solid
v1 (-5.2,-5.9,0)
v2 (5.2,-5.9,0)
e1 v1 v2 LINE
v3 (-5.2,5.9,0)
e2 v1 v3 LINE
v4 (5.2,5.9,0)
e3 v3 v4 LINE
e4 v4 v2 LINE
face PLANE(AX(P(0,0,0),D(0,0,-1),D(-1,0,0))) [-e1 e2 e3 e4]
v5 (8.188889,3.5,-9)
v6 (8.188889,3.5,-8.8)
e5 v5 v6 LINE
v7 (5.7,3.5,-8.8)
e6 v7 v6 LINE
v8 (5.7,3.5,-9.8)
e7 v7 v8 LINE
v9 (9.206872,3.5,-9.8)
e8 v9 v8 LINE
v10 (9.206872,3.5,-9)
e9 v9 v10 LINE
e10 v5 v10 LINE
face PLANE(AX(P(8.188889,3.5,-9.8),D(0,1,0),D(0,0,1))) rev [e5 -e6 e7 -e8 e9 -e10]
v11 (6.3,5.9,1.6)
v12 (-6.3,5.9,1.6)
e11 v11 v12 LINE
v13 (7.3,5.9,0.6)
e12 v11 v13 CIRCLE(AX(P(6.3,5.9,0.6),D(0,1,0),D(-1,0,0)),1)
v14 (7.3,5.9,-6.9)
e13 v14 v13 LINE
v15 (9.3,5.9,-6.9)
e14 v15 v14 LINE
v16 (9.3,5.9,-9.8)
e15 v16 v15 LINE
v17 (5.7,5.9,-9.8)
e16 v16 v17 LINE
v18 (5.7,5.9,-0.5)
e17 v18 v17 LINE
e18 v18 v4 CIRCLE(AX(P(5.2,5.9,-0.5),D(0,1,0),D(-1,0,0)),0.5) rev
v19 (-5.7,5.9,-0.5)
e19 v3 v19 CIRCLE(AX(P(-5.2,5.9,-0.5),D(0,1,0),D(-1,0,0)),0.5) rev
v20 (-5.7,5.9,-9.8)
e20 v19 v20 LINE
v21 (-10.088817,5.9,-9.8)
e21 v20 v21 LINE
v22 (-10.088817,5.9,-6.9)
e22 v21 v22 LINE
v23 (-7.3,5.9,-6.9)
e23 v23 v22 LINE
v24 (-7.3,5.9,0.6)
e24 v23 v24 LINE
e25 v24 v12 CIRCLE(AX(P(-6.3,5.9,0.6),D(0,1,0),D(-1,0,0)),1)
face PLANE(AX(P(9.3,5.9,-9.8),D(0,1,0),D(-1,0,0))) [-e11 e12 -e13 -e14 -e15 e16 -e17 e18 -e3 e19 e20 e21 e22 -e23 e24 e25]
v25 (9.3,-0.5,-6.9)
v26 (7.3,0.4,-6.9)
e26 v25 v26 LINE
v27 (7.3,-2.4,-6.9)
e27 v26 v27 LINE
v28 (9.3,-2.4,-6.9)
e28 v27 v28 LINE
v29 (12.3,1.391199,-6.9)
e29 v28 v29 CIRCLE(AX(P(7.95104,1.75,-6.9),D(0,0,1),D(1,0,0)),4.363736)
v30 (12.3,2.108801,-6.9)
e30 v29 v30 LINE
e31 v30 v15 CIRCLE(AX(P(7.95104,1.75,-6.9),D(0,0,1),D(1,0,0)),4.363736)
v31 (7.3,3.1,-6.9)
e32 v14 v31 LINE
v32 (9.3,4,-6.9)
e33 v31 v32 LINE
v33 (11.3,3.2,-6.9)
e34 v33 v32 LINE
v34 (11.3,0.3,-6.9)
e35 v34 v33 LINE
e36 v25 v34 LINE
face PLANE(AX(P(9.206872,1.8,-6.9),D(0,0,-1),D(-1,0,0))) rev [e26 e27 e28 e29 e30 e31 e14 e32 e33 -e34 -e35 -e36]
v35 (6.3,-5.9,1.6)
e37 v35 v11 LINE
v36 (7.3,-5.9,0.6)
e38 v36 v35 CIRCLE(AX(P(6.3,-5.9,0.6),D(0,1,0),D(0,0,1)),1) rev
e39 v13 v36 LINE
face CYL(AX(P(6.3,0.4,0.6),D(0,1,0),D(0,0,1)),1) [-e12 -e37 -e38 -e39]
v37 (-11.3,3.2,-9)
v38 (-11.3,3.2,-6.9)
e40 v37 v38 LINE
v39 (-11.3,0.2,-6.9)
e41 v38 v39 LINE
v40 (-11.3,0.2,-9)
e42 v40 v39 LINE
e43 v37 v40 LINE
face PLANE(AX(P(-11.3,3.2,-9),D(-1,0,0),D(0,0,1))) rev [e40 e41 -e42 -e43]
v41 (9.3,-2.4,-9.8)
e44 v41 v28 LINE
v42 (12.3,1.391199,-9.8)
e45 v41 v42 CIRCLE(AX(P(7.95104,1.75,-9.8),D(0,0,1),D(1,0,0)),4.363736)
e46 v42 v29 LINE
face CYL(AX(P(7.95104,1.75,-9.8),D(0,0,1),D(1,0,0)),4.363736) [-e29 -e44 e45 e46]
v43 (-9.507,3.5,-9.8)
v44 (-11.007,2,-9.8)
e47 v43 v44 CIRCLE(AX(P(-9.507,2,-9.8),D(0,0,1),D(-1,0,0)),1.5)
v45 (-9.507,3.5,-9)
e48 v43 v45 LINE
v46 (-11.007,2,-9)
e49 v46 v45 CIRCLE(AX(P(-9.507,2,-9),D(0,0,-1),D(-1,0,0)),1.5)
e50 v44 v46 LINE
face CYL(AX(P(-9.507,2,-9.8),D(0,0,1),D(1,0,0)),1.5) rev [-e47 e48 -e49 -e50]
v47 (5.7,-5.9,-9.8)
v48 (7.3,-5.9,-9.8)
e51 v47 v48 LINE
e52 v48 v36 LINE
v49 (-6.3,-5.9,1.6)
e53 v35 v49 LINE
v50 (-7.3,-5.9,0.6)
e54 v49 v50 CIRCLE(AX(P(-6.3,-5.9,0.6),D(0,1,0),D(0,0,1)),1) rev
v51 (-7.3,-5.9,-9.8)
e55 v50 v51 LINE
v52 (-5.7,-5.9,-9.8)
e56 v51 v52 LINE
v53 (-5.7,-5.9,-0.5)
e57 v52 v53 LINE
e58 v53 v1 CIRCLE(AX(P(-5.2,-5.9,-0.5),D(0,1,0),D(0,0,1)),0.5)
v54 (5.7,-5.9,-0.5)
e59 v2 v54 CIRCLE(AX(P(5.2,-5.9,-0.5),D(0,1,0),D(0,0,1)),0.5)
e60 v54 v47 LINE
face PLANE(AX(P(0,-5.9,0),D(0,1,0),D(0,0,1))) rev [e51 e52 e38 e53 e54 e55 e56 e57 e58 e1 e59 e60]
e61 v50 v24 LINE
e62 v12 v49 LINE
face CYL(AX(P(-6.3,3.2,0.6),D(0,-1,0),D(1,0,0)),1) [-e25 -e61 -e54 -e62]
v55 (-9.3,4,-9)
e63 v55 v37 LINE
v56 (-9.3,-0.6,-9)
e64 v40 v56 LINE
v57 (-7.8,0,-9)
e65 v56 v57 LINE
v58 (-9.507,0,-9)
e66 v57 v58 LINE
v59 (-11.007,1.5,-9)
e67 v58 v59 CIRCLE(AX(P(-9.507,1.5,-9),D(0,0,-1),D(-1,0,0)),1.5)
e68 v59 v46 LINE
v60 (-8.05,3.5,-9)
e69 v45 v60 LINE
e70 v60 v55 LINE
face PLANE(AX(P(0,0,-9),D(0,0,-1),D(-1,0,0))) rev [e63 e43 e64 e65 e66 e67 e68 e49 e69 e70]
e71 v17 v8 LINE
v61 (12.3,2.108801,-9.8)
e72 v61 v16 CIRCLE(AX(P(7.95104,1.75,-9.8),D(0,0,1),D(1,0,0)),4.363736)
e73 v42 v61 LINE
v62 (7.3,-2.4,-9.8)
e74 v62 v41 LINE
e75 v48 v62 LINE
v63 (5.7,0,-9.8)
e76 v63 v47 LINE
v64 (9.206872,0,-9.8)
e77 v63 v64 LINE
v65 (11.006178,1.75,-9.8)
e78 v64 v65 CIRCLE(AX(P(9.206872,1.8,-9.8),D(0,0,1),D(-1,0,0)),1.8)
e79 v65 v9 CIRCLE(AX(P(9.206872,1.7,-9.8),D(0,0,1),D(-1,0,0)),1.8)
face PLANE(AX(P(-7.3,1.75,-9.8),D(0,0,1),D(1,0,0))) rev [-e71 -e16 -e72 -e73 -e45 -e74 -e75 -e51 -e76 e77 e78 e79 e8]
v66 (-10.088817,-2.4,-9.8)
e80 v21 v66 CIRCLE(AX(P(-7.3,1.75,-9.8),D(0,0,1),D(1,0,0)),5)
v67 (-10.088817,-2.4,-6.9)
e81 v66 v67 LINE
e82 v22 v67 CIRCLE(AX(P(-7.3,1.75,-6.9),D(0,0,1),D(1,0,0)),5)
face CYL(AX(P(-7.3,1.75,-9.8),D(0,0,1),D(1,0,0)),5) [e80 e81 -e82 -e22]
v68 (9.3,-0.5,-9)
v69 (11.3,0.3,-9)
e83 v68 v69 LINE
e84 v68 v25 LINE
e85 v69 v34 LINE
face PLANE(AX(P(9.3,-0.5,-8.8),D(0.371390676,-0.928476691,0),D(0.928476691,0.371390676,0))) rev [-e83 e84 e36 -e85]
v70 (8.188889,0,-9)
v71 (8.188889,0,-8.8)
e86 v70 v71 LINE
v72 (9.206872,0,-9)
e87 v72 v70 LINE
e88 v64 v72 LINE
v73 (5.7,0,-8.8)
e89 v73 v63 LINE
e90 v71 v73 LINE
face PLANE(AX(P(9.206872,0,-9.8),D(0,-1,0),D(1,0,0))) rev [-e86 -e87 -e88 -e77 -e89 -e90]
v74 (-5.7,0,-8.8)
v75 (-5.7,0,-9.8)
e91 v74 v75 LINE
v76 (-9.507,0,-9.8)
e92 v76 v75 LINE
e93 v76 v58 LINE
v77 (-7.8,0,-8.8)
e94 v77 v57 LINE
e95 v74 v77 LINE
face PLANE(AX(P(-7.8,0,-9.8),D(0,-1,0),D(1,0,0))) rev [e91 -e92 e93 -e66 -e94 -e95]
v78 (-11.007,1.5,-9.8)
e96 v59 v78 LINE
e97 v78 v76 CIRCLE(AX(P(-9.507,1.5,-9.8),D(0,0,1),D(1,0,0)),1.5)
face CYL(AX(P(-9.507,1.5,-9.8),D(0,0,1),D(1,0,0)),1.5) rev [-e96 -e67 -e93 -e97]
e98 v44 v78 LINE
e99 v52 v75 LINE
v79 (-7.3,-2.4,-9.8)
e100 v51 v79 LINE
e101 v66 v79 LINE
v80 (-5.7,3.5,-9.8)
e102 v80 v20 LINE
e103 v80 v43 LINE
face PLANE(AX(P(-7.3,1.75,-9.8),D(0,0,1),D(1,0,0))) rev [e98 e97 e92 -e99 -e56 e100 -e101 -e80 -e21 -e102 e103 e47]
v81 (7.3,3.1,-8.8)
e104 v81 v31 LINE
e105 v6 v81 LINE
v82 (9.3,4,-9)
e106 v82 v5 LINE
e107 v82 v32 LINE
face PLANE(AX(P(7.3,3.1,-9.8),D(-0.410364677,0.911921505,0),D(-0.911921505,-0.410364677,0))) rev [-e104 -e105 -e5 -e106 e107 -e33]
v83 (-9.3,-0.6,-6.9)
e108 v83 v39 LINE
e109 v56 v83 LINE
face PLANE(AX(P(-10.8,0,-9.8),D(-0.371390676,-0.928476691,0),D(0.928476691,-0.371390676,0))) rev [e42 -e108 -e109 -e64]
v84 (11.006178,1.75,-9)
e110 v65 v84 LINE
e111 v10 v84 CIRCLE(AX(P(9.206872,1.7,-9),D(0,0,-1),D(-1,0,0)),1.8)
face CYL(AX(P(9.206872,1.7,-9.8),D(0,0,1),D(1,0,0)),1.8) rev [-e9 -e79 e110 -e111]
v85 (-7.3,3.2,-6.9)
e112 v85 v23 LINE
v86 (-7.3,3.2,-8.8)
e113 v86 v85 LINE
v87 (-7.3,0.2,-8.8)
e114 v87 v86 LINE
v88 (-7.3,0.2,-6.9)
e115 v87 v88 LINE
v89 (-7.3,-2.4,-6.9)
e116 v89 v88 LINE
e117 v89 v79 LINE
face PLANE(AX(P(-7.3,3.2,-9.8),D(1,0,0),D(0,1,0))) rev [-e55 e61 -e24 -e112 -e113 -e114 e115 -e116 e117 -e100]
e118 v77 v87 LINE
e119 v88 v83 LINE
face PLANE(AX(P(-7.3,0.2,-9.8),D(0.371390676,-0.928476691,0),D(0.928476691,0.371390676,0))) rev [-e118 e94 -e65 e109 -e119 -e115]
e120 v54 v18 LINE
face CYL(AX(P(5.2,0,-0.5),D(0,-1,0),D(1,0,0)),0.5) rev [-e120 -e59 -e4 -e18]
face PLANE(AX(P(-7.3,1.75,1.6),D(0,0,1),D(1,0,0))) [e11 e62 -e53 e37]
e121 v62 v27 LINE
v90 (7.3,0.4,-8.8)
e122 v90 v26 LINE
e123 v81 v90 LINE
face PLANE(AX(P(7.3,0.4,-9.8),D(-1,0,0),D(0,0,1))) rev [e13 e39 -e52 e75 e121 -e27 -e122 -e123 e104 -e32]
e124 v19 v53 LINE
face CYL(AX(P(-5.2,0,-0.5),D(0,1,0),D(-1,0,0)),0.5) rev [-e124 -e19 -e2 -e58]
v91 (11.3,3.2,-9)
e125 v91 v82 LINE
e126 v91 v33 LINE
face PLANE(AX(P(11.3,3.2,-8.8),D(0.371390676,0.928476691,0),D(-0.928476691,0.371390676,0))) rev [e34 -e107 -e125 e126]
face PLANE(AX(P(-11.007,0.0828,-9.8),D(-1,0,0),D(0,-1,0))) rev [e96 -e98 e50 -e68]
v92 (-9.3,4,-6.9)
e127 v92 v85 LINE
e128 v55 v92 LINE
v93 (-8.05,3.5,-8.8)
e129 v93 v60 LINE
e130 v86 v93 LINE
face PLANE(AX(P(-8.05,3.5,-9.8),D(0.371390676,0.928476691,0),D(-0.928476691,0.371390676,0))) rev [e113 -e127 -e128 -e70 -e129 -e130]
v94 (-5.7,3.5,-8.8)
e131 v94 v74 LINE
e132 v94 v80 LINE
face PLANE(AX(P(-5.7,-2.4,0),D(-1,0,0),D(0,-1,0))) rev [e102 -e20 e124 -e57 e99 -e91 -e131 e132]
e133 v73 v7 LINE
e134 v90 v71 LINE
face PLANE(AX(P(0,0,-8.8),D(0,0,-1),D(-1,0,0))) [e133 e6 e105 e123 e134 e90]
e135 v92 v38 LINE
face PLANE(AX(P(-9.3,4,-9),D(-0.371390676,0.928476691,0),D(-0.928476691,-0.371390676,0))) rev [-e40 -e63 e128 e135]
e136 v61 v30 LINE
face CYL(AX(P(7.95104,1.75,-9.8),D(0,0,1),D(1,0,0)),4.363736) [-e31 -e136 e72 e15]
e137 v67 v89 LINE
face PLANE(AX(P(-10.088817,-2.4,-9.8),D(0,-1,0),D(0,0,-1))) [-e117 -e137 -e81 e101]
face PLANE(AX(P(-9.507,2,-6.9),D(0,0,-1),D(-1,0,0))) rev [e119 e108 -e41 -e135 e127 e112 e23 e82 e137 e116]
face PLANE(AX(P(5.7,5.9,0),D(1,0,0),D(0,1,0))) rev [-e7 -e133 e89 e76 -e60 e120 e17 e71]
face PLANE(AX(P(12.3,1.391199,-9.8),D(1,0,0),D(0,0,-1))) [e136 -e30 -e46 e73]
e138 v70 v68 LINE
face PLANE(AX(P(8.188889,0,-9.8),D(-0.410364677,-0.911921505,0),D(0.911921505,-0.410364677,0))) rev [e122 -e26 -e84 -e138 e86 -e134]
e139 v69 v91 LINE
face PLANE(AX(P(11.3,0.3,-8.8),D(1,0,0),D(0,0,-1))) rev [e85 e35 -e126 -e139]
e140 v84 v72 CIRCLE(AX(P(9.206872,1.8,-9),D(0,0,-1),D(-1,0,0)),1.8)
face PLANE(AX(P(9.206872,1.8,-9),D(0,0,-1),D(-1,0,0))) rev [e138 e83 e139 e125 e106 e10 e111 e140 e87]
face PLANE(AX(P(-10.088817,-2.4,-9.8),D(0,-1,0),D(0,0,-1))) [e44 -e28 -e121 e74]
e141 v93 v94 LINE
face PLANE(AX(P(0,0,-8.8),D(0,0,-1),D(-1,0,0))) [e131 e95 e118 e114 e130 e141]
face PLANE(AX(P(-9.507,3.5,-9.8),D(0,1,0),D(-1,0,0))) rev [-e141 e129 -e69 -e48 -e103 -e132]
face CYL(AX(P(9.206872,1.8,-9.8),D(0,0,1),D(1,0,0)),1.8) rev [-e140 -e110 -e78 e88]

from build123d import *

# Parameters (mm, degrees)
EXTRUDE_1_DEPTH      = 11.4
SKETCH_2_W           = 11.4
SKETCH_2_H           = 8.3
CUT_EXTRUDE_1_DEPTH  = 9.8
CUT_EXTRUDE_2_DEPTH  = 10.6
CUT_EXTRUDE_3_DEPTH  = 0.8
CUT_EXTRUDE_4_DEPTH  = 8.5
CUT_EXTRUDE_5_DEPTH  = 0.8
CUT_EXTRUDE_6_DEPTH  = 2.1
CUT_EXTRUDE_7_DEPTH  = 0.2
CUT_EXTRUDE_8_DEPTH  = 1
CUT_EXTRUDE_9_DEPTH  = 8.5
CUT_EXTRUDE_10_DEPTH = 1.9
CUT_EXTRUDE_11_DEPTH = 0.2
EXTRUDE_2_DEPTH      = 3.5
FILLET_1_R           = 0.5
FILLET_2_R           = 1
FILLET_3_R           = 1.5


with BuildPart() as part:
    # 草图1 → 凸台-拉伸1 (new body)
    with BuildSketch(Plane.XY.offset(1.6)):
        with BuildLine():
            Line((-10.088816953, -2.4), (9.3, -2.4))
            ThreePointArc((9.3, -2.4), (11.373008704, -0.957826085), (12.3, 1.391198782))
            Line((12.3, 1.391198782), (12.3, 2.108801218))
            ThreePointArc((12.3, 2.108801218), (11.373008704, 4.457826085), (9.3, 5.9))
            Line((9.3, 5.9), (-10.088816953, 5.9))
            ThreePointArc((-10.088816953, 5.9), (-12.3, 1.75), (-10.088816953, -2.4))
        make_face()
        with BuildLine():
            Line((-7.8, 0), (-10.8, 0))
            Line((-10.8, 0), (-11.007, 0.0828))
            Line((-11.007, 0.0828), (-11.007, 2))
            ThreePointArc((-11.007, 2), (-10.567660172, 3.060660172), (-9.507, 3.5))
            Line((-9.507, 3.5), (-8.05, 3.5))
            Line((-8.05, 3.5), (-7.3, 3.2))
            Line((-7.3, 3.2), (-7.3, 0.2))
            Line((-7.3, 0.2), (-7.8, 0))
        make_face(mode=Mode.SUBTRACT)
        with BuildLine():
            Line((7.3, 0.4), (7.3, 3.1))
            Line((7.3, 3.1), (8.188888889, 3.5))
            Line((8.188888889, 3.5), (9.206872393, 3.5))
            ThreePointArc((9.206872393, 3.5), (10.461862433, 2.99034879), (11.006177815, 1.75))
            ThreePointArc((11.006177815, 1.75), (10.461862433, 0.50965121), (9.206872393, 0))
            Line((9.206872393, 0), (8.188888889, 0))
            Line((8.188888889, 0), (7.3, 0.4))
        make_face(mode=Mode.SUBTRACT)
    extrude(amount=-EXTRUDE_1_DEPTH)

    # 草图2 → 切除-拉伸1 (cut)
    with BuildSketch(Plane(origin=(0, 0, -9.8), x_dir=(-1, 0, 0), z_dir=(0, 0, -1))):
        with Locations((0, 1.75)):
            Rectangle(SKETCH_2_W, SKETCH_2_H)
    extrude(amount=-CUT_EXTRUDE_1_DEPTH, mode=Mode.SUBTRACT)

    # 草图3 → 切除-拉伸2 (cut)
    with BuildSketch(Plane.XY.offset(1.6)):
        Polygon((-7.8, 0), (-10.8, 0), (-9.3, -0.6), align=None)
    extrude(amount=-CUT_EXTRUDE_2_DEPTH, mode=Mode.SUBTRACT)

    # 草图4 → 切除-拉伸3 (cut)
    with BuildSketch(Plane(origin=(0, 0, -9.8), x_dir=(-1, 0, 0), z_dir=(0, 0, -1))):
        Polygon((11.007, 0.0828), (10.8, 0), (11.007, 0), align=None)
    extrude(amount=-CUT_EXTRUDE_3_DEPTH, mode=Mode.SUBTRACT)

    # 草图5 → 切除-拉伸4 (cut)
    with BuildSketch(Plane.XY.offset(1.6)):
        with BuildLine():
            Line((-9.507, 3.5), (-8.05, 3.5))
            Line((-8.05, 3.5), (-7.3, 3.2))
            Line((-7.3, 3.2), (-7.3, 5.9))
            Line((-7.3, 5.9), (-10.088816953, 5.9))
            ThreePointArc((-10.088816953, 5.9), (-12.3, 1.75), (-10.088816953, -2.4))
            Line((-10.088816953, -2.4), (-7.3, -2.4))
            Line((-7.3, -2.4), (-7.3, 0.2))
            Line((-7.3, 0.2), (-9.3, -0.6))
            Line((-9.3, -0.6), (-11.007, 0.0828))
            Line((-11.007, 0.0828), (-11.007, 2))
            ThreePointArc((-11.007, 2), (-10.567660172, 3.060660172), (-9.507, 3.5))
        make_face()
    extrude(amount=-CUT_EXTRUDE_4_DEPTH, mode=Mode.SUBTRACT)

    # 草图6 → 切除-拉伸5 (cut)
    with BuildSketch(Plane(origin=(0, 0, -9.8), x_dir=(-1, 0, 0), z_dir=(0, 0, -1))):
        Polygon((7.3, 3.2), (8.05, 3.5), (5.7, 3.5), (5.7, 0), (7.8, 0), (7.3, 0.2), align=None)
    extrude(amount=-CUT_EXTRUDE_5_DEPTH, mode=Mode.SUBTRACT)

    # 草图7 → 切除-拉伸6 (cut)
    with BuildSketch(Plane.XY.offset(-6.9)):
        with BuildLine():
            Line((-9.507, 3.5), (-8.05, 3.5))
            Line((-8.05, 3.5), (-9.3, 4))
            Line((-9.3, 4), (-11.3, 3.2))
            Line((-11.3, 3.2), (-11.3, 0.2))
            Line((-11.3, 0.2), (-11.007, 0.0828))
            Line((-11.007, 0.0828), (-11.007, 2))
            ThreePointArc((-11.007, 2), (-10.567660172, 3.060660172), (-9.507, 3.5))
        make_face()
    extrude(amount=-CUT_EXTRUDE_6_DEPTH, mode=Mode.SUBTRACT)

    # 草图8 → 切除-拉伸7 (cut)
    with BuildSketch(Plane(origin=(0, 0, -9), x_dir=(-1, 0, 0), z_dir=(0, 0, -1))):
        Polygon((7.3, 3.2), (8.05, 3.5), (5.7, 3.5), (5.7, 0), (7.8, 0), (7.3, 0.2), align=None)
    extrude(amount=-CUT_EXTRUDE_7_DEPTH, mode=Mode.SUBTRACT)

    # 草图9 → 切除-拉伸8 (cut)
    with BuildSketch(Plane(origin=(0, 0, -9.8), x_dir=(-1, 0, 0), z_dir=(0, 0, -1))):
        Polygon((-7.3, 0.4), (-8.188888889, 0), (-5.7, 0), (-5.7, 3.5), (-8.188888889, 3.5), (-7.3, 3.1), align=None)
    extrude(amount=-CUT_EXTRUDE_8_DEPTH, mode=Mode.SUBTRACT)

    # 草图10 → 切除-拉伸9 (cut)
    with BuildSketch(Plane.XY.offset(1.6)):
        with BuildLine():
            Line((9.206872393, 0), (8.188888889, 0))
            Line((8.188888889, 0), (7.3, 0.4))
            Line((7.3, 0.4), (7.3, -2.4))
            Line((7.3, -2.4), (9.3, -2.4))
            ThreePointArc((9.3, -2.4), (11.373008704, -0.957826085), (12.3, 1.391198782))
            Line((12.3, 1.391198782), (12.3, 2.108801218))
            ThreePointArc((12.3, 2.108801218), (11.373008704, 4.457826085), (9.3, 5.9))
            Line((9.3, 5.9), (7.3, 5.9))
            Line((7.3, 5.9), (7.3, 3.1))
            Line((7.3, 3.1), (8.188888889, 3.5))
            Line((8.188888889, 3.5), (9.206872393, 3.5))
            ThreePointArc((9.206872393, 3.5), (10.461862433, 2.99034879), (11.006177815, 1.75))
            ThreePointArc((11.006177815, 1.75), (10.461862433, 0.50965121), (9.206872393, 0))
        make_face()
    extrude(amount=-CUT_EXTRUDE_9_DEPTH, mode=Mode.SUBTRACT)

    # 草图11 → 切除-拉伸10 (cut)
    with BuildSketch(Plane.XY.offset(-6.9)):
        with BuildLine():
            Line((9.206872393, 0), (8.188888889, 0))
            Line((8.188888889, 0), (9.3, -0.5))
            Line((9.3, -0.5), (11.3, 0.3))
            Line((11.3, 0.3), (11.3, 3.2))
            Line((11.3, 3.2), (9.3, 4))
            Line((9.3, 4), (8.188888889, 3.5))
            Line((8.188888889, 3.5), (9.206872393, 3.5))
            ThreePointArc((9.206872393, 3.5), (10.461862433, 2.99034879), (11.006177815, 1.75))
            ThreePointArc((11.006177815, 1.75), (10.461862433, 0.50965121), (9.206872393, 0))
        make_face()
    extrude(amount=-CUT_EXTRUDE_10_DEPTH, mode=Mode.SUBTRACT)

    # 草图12 → 切除-拉伸11 (cut)
    with BuildSketch(Plane.XY.offset(-8.8)):
        with BuildLine():
            Line((9.206872393, 0), (8.188888889, 0))
            Line((8.188888889, 0), (9.3, -0.5))
            Line((9.3, -0.5), (11.3, 0.3))
            Line((11.3, 0.3), (11.3, 3.2))
            Line((11.3, 3.2), (9.3, 4))
            Line((9.3, 4), (8.188888889, 3.5))
            Line((8.188888889, 3.5), (9.206872393, 3.5))
            ThreePointArc((9.206872393, 3.5), (10.461862433, 2.99034879), (11.006177815, 1.75))
            ThreePointArc((11.006177815, 1.75), (10.461862433, 0.50965121), (9.206872393, 0))
        make_face()
    extrude(amount=-CUT_EXTRUDE_11_DEPTH, mode=Mode.SUBTRACT)

    # 草图13 → 凸台-拉伸2 (add)
    with BuildSketch(Plane.XZ.offset(2.4)):
        Polygon((-7.3, 1.6), (7.3, 1.6), (7.3, -9.8), (5.7, -9.8), (5.7, 0), (-5.7, 0), (-5.7, -9.8), (-7.3, -9.8), align=None)
    extrude(amount=EXTRUDE_2_DEPTH)

    # 圆角1
    fillet_1_edges = [part.edges().sort_by_distance(p)[0] for p in [
        (5.7, 0, 0),
        (-5.7, 0, 0),
    ]]
    fillet(fillet_1_edges, radius=FILLET_1_R)

    # 圆角2
    fillet_2_edges = [part.edges().sort_by_distance(p)[0] for p in [
        (-7.3, 0, 1.6),
        (7.3, 0, 1.6),
    ]]
    fillet(fillet_2_edges, radius=FILLET_2_R)

    # 圆角3
    # the kernel refuses this fillet: 1.5 mm, written as the material it adds along each edge
    with BuildSketch(Plane(origin=(-11.007, 0, -9.8), x_dir=(1.0, 7.597747752272154e-12, 0), z_dir=(0, 0, 1))) as fillet_3_piece_1:
        with BuildLine():
            CenterArc((FILLET_3_R, FILLET_3_R), FILLET_3_R, 180, 90)
            Line((0, FILLET_3_R), (0, 0))
            Line((0, 0), (FILLET_3_R, 0))
        make_face()
    extrude(amount=0.8)


solid = part.part
